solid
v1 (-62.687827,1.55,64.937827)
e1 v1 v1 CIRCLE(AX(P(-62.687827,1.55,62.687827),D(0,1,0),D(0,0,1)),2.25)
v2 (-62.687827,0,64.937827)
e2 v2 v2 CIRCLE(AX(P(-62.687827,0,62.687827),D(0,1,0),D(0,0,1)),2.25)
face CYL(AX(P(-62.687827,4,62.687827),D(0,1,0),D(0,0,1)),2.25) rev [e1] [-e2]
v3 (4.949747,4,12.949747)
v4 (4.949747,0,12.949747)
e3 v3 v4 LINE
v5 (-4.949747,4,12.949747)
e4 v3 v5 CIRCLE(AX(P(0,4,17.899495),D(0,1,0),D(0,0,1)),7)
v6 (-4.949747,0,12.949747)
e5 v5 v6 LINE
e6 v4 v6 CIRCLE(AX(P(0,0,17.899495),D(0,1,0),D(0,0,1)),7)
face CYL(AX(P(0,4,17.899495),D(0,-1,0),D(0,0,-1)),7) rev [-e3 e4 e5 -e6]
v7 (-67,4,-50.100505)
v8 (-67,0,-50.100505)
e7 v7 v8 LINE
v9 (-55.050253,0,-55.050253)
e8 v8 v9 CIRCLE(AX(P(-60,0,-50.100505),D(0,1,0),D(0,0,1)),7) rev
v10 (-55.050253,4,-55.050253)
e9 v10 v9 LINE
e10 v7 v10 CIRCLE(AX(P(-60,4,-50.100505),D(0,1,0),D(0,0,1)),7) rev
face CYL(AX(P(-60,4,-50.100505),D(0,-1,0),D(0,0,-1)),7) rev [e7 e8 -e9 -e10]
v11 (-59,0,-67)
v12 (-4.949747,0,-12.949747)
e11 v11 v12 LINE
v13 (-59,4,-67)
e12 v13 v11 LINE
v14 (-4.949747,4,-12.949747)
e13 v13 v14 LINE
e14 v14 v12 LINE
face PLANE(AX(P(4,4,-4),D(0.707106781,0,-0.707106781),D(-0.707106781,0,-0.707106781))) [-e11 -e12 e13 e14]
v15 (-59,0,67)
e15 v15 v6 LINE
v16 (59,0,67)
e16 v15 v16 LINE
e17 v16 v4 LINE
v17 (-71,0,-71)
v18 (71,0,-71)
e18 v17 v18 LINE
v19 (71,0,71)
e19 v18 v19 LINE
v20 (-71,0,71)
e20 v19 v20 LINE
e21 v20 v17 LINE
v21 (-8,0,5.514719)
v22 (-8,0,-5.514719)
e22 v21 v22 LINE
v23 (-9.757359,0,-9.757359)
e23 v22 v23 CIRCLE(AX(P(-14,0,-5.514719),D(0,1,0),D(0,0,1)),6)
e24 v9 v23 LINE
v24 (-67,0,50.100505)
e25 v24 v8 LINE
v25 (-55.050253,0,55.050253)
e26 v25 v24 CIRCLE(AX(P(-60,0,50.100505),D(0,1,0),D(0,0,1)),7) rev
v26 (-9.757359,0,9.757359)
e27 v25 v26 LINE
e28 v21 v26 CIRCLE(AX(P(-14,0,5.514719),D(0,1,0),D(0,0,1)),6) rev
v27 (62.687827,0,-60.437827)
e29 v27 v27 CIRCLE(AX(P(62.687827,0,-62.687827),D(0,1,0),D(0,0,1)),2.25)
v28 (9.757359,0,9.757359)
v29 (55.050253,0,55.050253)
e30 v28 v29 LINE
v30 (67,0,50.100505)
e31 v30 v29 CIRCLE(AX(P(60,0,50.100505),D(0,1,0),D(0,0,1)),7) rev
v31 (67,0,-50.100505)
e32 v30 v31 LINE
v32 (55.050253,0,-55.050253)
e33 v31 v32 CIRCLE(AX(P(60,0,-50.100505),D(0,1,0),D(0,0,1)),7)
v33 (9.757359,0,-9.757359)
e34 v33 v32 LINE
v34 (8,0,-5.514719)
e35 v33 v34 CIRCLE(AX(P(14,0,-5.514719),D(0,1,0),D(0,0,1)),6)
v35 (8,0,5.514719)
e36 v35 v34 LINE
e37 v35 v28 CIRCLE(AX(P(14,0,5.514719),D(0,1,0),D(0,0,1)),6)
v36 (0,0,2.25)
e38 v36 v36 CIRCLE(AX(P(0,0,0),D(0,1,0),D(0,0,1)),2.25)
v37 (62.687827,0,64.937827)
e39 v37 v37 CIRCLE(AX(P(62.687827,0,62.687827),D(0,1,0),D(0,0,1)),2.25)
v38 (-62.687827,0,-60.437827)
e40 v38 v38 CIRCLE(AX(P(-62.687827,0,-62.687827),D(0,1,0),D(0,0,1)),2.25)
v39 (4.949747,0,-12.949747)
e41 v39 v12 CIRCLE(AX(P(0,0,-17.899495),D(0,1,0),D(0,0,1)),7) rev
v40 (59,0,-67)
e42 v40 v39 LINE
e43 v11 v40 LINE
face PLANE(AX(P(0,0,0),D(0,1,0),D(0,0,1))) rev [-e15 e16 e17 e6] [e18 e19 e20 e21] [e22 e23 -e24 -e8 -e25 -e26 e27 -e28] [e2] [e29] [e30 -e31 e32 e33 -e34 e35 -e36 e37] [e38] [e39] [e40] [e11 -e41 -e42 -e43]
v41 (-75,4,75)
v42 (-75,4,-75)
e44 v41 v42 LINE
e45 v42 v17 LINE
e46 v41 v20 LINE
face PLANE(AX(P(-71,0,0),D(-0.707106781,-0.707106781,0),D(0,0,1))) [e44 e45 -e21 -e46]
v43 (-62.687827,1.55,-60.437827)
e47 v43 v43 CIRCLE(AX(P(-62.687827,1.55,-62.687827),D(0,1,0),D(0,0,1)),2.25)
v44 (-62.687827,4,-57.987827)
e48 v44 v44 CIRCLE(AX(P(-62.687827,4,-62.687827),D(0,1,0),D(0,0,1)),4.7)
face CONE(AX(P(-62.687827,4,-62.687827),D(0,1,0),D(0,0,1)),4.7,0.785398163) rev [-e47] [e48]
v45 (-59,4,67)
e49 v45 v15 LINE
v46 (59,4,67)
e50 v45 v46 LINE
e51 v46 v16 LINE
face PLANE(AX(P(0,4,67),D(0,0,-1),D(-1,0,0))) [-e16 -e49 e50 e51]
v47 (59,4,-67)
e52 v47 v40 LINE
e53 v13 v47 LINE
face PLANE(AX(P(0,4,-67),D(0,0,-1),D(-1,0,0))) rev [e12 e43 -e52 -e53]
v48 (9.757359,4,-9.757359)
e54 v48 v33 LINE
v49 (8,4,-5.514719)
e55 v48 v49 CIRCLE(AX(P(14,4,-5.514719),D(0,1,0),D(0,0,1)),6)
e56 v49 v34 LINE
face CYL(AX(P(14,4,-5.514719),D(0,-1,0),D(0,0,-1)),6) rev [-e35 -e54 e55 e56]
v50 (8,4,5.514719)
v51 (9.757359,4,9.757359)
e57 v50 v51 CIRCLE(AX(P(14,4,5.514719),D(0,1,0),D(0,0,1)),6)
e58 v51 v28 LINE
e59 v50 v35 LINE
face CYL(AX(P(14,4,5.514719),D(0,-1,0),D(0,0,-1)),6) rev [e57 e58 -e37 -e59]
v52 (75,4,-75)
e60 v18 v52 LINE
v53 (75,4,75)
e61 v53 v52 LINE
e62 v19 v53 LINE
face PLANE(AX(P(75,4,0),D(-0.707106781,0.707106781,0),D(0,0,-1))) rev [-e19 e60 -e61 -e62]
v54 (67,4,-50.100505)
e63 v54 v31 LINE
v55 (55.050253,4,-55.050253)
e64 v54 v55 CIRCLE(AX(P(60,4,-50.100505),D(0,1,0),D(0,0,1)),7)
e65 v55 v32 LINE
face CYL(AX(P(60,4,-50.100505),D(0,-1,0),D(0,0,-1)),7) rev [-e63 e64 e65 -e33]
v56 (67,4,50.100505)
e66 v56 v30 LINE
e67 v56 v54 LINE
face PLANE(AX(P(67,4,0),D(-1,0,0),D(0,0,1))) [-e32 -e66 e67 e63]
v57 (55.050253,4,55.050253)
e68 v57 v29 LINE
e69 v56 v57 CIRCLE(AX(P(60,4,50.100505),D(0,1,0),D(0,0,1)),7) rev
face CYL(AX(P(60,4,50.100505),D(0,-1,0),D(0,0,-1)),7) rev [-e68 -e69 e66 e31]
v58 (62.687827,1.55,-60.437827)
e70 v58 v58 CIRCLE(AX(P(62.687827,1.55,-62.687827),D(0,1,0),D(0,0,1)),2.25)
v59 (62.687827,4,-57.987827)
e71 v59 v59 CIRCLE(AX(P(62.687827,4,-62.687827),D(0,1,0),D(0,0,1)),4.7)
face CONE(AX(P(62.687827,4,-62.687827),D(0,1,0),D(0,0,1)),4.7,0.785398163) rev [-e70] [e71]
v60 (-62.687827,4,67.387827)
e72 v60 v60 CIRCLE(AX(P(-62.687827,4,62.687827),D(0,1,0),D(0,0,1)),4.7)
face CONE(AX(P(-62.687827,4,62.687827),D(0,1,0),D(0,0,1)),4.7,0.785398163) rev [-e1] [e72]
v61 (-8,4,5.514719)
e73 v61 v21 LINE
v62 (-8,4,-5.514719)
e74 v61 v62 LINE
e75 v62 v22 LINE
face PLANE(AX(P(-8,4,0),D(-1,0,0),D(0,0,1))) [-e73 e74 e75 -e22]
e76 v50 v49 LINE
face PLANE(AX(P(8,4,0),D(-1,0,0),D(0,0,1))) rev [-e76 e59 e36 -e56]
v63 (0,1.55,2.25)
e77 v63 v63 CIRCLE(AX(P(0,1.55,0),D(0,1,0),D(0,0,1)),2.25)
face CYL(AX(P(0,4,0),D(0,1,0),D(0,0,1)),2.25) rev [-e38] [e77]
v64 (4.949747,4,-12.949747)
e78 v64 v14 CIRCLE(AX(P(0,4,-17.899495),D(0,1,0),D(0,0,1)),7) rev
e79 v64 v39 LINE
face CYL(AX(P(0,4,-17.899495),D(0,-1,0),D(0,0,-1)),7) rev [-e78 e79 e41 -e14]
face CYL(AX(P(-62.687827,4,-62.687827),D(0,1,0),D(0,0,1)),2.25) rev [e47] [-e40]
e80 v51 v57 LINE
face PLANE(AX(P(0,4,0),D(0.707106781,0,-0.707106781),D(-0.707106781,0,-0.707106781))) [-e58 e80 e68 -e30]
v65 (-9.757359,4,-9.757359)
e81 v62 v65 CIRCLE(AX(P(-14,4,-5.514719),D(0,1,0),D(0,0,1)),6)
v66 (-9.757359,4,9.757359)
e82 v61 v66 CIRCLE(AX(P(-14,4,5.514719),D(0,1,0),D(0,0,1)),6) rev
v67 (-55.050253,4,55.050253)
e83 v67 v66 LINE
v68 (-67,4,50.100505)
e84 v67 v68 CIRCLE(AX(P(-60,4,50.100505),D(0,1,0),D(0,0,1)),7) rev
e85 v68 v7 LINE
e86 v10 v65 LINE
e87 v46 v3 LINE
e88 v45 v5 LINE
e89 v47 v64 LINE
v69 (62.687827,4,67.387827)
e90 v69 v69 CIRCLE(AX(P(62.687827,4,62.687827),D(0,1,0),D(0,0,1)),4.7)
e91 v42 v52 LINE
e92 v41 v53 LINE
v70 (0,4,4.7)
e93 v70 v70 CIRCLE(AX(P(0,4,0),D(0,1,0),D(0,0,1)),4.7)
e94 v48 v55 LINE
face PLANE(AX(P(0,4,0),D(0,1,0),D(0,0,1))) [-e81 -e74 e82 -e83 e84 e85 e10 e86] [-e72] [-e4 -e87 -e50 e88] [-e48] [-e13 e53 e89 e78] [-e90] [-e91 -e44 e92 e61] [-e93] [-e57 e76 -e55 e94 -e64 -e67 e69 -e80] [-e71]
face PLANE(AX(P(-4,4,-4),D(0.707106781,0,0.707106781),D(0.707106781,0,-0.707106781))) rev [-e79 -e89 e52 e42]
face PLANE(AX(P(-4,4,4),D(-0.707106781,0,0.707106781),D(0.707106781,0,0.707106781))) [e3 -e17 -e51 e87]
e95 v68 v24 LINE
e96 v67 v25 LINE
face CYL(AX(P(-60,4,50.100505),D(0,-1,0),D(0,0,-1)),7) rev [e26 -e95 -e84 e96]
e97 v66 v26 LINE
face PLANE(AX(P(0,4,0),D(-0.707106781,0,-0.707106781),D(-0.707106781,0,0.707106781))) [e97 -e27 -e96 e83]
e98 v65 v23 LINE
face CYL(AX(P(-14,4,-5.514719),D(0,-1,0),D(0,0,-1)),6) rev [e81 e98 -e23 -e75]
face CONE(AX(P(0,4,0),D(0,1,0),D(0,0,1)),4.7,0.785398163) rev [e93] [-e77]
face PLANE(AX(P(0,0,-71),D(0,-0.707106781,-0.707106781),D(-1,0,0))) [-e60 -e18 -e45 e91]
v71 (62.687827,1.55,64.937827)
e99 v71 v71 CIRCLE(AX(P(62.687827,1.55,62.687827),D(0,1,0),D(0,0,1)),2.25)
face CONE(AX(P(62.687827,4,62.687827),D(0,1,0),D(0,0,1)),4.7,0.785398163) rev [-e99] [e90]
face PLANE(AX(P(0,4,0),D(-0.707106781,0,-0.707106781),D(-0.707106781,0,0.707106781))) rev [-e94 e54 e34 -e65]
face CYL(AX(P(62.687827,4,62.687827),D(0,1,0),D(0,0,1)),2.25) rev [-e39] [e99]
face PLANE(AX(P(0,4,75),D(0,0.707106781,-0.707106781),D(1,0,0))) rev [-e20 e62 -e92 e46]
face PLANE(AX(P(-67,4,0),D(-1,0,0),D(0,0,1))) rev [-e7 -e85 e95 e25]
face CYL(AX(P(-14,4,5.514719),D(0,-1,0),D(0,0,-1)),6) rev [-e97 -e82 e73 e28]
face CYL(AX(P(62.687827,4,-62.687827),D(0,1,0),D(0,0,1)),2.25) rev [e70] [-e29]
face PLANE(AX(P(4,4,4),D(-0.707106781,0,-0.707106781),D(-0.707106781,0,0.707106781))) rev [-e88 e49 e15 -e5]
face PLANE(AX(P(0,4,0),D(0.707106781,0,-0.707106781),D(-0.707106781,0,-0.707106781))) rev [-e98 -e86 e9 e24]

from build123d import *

# Parameters (mm, degrees)
SKETCH1_W                                      = 150
SKETCH1_H                                      = 150
BOSS_EXTRUDE2_DEPTH                            = 4
CSK_FOR_M4_FLAT_HEAD_MACHINE_SCREW1_AT_2_COUNT = 2
CSK_FOR_M4_FLAT_HEAD_MACHINE_SCREW1_AT_2_PITCH = 88.653975713
CSK_FOR_M4_FLAT_HEAD_MACHINE_SCREW1_AT_3_COUNT = 2
CSK_FOR_M4_FLAT_HEAD_MACHINE_SCREW1_AT_3_PITCH = 88.653975713
CSK_FOR_M4_FLAT_HEAD_MACHINE_SCREW1_AT_4_COUNT = 2
CSK_FOR_M4_FLAT_HEAD_MACHINE_SCREW1_AT_4_PITCH = 88.653975713
CSK_FOR_M4_FLAT_HEAD_MACHINE_SCREW1_AT_5_COUNT = 2
CSK_FOR_M4_FLAT_HEAD_MACHINE_SCREW1_AT_5_PITCH = 88.653975713
CHAMFER2_SIZE                                  = 4


with BuildPart() as part:
    # Sketch1 → Boss-Extrude2 (new body)
    with BuildSketch(Plane(origin=(0, 0, 0), x_dir=(1, 0, 0), z_dir=(0, 1, 0))):
        Rectangle(SKETCH1_W, SKETCH1_H)
        with BuildLine():
            Line((-59, 67), (59, 67))
            Line((59, 67), (4.949747468, 12.949747468))
            ThreePointArc((4.949747468, 12.949747468), (0, 10.899494937), (-4.949747468, 12.949747468))
            Line((-4.949747468, 12.949747468), (-59, 67))
        make_face(mode=Mode.SUBTRACT)
        with BuildLine():
            Line((59, -67), (-59, -67))
            Line((-59, -67), (-4.949747468, -12.949747468))
            ThreePointArc((-4.949747468, -12.949747468), (0, -10.899494937), (4.949747468, -12.949747468))
            Line((4.949747468, -12.949747468), (59, -67))
        make_face(mode=Mode.SUBTRACT)
        with BuildLine():
            Line((-67, -50.100505063), (-67, 50.100505063))
            ThreePointArc((-67, 50.100505063), (-62.678784027, 56.567661791), (-55.050252532, 55.050252532))
            Line((-55.050252532, 55.050252532), (-9.757359313, 9.757359313))
            ThreePointArc((-9.757359313, 9.757359313), (-8.456722805, 7.81081922), (-8, 5.514718626))
            Line((-8, 5.514718626), (-8, -5.514718626))
            ThreePointArc((-8, -5.514718626), (-8.456722805, -7.81081922), (-9.757359313, -9.757359313))
            Line((-9.757359313, -9.757359313), (-55.050252532, -55.050252532))
            ThreePointArc((-55.050252532, -55.050252532), (-62.678784027, -56.567661791), (-67, -50.100505063))
        make_face(mode=Mode.SUBTRACT)
        with BuildLine():
            ThreePointArc((67, -50.100505063), (62.678784027, -56.567661791), (55.050252532, -55.050252532))
            Line((55.050252532, -55.050252532), (9.757359313, -9.757359313))
            ThreePointArc((9.757359313, -9.757359313), (8.456722805, -7.81081922), (8, -5.514718626))
            Line((8, -5.514718626), (8, 5.514718626))
            ThreePointArc((8, 5.514718626), (8.456722805, 7.81081922), (9.757359313, 9.757359313))
            Line((9.757359313, 9.757359313), (55.050252532, 55.050252532))
            ThreePointArc((55.050252532, 55.050252532), (62.678784027, 56.567661791), (67, 50.100505063))
            Line((67, 50.100505063), (67, -50.100505063))
        make_face(mode=Mode.SUBTRACT)
    extrude(amount=BOSS_EXTRUDE2_DEPTH)

    # Sketch5 → CSK for M4 Flat Head Machine Screw1 (revolve, cut)
    with BuildSketch(Plane(origin=(0, 4, 0), x_dir=(0, 0, 1), z_dir=(1, 0, 0))):
        Polygon((0, 0), (0, 4), (2.25, 4), (2.25, 2.45), (4.7, 0), align=None)
    csk_for_m4_flat_head_machine_screw1 = revolve(axis=Axis((0, 10.35, 0), (0, -1, 0)), mode=Mode.SUBTRACT)

    # CSK for M4 Flat Head Machine Screw1 at 2: CSK for M4 Flat Head Machine Screw1 ×2
    with Locations(*[Vector(-0.7071067811865477, 0, -0.7071067811865474) * (i * CSK_FOR_M4_FLAT_HEAD_MACHINE_SCREW1_AT_2_PITCH) for i in range(1, CSK_FOR_M4_FLAT_HEAD_MACHINE_SCREW1_AT_2_COUNT)]):
        add(csk_for_m4_flat_head_machine_screw1, mode=Mode.SUBTRACT)

    # CSK for M4 Flat Head Machine Screw1 at 3: CSK for M4 Flat Head Machine Screw1 ×2
    with Locations(*[Vector(0.7071067811865477, 0, -0.7071067811865474) * (i * CSK_FOR_M4_FLAT_HEAD_MACHINE_SCREW1_AT_3_PITCH) for i in range(1, CSK_FOR_M4_FLAT_HEAD_MACHINE_SCREW1_AT_3_COUNT)]):
        add(csk_for_m4_flat_head_machine_screw1, mode=Mode.SUBTRACT)

    # CSK for M4 Flat Head Machine Screw1 at 4: CSK for M4 Flat Head Machine Screw1 ×2
    with Locations(*[Vector(0.7071067811865477, 0, 0.7071067811865474) * (i * CSK_FOR_M4_FLAT_HEAD_MACHINE_SCREW1_AT_4_PITCH) for i in range(1, CSK_FOR_M4_FLAT_HEAD_MACHINE_SCREW1_AT_4_COUNT)]):
        add(csk_for_m4_flat_head_machine_screw1, mode=Mode.SUBTRACT)

    # CSK for M4 Flat Head Machine Screw1 at 5: CSK for M4 Flat Head Machine Screw1 ×2
    with Locations(*[Vector(-0.7071067811865477, 0, 0.7071067811865474) * (i * CSK_FOR_M4_FLAT_HEAD_MACHINE_SCREW1_AT_5_PITCH) for i in range(1, CSK_FOR_M4_FLAT_HEAD_MACHINE_SCREW1_AT_5_COUNT)]):
        add(csk_for_m4_flat_head_machine_screw1, mode=Mode.SUBTRACT)

    # Chamfer2
    chamfer2_edges = [part.edges().sort_by_distance(p)[0] for p in [
        (0, 0, 75),
        (-75, 0, 0),
        (0, 0, -75),
        (75, 0, 0),
    ]]
    chamfer(chamfer2_edges, length=CHAMFER2_SIZE - 0.0001)  # a hair under: the kernel refuses the full size


solid = part.part
